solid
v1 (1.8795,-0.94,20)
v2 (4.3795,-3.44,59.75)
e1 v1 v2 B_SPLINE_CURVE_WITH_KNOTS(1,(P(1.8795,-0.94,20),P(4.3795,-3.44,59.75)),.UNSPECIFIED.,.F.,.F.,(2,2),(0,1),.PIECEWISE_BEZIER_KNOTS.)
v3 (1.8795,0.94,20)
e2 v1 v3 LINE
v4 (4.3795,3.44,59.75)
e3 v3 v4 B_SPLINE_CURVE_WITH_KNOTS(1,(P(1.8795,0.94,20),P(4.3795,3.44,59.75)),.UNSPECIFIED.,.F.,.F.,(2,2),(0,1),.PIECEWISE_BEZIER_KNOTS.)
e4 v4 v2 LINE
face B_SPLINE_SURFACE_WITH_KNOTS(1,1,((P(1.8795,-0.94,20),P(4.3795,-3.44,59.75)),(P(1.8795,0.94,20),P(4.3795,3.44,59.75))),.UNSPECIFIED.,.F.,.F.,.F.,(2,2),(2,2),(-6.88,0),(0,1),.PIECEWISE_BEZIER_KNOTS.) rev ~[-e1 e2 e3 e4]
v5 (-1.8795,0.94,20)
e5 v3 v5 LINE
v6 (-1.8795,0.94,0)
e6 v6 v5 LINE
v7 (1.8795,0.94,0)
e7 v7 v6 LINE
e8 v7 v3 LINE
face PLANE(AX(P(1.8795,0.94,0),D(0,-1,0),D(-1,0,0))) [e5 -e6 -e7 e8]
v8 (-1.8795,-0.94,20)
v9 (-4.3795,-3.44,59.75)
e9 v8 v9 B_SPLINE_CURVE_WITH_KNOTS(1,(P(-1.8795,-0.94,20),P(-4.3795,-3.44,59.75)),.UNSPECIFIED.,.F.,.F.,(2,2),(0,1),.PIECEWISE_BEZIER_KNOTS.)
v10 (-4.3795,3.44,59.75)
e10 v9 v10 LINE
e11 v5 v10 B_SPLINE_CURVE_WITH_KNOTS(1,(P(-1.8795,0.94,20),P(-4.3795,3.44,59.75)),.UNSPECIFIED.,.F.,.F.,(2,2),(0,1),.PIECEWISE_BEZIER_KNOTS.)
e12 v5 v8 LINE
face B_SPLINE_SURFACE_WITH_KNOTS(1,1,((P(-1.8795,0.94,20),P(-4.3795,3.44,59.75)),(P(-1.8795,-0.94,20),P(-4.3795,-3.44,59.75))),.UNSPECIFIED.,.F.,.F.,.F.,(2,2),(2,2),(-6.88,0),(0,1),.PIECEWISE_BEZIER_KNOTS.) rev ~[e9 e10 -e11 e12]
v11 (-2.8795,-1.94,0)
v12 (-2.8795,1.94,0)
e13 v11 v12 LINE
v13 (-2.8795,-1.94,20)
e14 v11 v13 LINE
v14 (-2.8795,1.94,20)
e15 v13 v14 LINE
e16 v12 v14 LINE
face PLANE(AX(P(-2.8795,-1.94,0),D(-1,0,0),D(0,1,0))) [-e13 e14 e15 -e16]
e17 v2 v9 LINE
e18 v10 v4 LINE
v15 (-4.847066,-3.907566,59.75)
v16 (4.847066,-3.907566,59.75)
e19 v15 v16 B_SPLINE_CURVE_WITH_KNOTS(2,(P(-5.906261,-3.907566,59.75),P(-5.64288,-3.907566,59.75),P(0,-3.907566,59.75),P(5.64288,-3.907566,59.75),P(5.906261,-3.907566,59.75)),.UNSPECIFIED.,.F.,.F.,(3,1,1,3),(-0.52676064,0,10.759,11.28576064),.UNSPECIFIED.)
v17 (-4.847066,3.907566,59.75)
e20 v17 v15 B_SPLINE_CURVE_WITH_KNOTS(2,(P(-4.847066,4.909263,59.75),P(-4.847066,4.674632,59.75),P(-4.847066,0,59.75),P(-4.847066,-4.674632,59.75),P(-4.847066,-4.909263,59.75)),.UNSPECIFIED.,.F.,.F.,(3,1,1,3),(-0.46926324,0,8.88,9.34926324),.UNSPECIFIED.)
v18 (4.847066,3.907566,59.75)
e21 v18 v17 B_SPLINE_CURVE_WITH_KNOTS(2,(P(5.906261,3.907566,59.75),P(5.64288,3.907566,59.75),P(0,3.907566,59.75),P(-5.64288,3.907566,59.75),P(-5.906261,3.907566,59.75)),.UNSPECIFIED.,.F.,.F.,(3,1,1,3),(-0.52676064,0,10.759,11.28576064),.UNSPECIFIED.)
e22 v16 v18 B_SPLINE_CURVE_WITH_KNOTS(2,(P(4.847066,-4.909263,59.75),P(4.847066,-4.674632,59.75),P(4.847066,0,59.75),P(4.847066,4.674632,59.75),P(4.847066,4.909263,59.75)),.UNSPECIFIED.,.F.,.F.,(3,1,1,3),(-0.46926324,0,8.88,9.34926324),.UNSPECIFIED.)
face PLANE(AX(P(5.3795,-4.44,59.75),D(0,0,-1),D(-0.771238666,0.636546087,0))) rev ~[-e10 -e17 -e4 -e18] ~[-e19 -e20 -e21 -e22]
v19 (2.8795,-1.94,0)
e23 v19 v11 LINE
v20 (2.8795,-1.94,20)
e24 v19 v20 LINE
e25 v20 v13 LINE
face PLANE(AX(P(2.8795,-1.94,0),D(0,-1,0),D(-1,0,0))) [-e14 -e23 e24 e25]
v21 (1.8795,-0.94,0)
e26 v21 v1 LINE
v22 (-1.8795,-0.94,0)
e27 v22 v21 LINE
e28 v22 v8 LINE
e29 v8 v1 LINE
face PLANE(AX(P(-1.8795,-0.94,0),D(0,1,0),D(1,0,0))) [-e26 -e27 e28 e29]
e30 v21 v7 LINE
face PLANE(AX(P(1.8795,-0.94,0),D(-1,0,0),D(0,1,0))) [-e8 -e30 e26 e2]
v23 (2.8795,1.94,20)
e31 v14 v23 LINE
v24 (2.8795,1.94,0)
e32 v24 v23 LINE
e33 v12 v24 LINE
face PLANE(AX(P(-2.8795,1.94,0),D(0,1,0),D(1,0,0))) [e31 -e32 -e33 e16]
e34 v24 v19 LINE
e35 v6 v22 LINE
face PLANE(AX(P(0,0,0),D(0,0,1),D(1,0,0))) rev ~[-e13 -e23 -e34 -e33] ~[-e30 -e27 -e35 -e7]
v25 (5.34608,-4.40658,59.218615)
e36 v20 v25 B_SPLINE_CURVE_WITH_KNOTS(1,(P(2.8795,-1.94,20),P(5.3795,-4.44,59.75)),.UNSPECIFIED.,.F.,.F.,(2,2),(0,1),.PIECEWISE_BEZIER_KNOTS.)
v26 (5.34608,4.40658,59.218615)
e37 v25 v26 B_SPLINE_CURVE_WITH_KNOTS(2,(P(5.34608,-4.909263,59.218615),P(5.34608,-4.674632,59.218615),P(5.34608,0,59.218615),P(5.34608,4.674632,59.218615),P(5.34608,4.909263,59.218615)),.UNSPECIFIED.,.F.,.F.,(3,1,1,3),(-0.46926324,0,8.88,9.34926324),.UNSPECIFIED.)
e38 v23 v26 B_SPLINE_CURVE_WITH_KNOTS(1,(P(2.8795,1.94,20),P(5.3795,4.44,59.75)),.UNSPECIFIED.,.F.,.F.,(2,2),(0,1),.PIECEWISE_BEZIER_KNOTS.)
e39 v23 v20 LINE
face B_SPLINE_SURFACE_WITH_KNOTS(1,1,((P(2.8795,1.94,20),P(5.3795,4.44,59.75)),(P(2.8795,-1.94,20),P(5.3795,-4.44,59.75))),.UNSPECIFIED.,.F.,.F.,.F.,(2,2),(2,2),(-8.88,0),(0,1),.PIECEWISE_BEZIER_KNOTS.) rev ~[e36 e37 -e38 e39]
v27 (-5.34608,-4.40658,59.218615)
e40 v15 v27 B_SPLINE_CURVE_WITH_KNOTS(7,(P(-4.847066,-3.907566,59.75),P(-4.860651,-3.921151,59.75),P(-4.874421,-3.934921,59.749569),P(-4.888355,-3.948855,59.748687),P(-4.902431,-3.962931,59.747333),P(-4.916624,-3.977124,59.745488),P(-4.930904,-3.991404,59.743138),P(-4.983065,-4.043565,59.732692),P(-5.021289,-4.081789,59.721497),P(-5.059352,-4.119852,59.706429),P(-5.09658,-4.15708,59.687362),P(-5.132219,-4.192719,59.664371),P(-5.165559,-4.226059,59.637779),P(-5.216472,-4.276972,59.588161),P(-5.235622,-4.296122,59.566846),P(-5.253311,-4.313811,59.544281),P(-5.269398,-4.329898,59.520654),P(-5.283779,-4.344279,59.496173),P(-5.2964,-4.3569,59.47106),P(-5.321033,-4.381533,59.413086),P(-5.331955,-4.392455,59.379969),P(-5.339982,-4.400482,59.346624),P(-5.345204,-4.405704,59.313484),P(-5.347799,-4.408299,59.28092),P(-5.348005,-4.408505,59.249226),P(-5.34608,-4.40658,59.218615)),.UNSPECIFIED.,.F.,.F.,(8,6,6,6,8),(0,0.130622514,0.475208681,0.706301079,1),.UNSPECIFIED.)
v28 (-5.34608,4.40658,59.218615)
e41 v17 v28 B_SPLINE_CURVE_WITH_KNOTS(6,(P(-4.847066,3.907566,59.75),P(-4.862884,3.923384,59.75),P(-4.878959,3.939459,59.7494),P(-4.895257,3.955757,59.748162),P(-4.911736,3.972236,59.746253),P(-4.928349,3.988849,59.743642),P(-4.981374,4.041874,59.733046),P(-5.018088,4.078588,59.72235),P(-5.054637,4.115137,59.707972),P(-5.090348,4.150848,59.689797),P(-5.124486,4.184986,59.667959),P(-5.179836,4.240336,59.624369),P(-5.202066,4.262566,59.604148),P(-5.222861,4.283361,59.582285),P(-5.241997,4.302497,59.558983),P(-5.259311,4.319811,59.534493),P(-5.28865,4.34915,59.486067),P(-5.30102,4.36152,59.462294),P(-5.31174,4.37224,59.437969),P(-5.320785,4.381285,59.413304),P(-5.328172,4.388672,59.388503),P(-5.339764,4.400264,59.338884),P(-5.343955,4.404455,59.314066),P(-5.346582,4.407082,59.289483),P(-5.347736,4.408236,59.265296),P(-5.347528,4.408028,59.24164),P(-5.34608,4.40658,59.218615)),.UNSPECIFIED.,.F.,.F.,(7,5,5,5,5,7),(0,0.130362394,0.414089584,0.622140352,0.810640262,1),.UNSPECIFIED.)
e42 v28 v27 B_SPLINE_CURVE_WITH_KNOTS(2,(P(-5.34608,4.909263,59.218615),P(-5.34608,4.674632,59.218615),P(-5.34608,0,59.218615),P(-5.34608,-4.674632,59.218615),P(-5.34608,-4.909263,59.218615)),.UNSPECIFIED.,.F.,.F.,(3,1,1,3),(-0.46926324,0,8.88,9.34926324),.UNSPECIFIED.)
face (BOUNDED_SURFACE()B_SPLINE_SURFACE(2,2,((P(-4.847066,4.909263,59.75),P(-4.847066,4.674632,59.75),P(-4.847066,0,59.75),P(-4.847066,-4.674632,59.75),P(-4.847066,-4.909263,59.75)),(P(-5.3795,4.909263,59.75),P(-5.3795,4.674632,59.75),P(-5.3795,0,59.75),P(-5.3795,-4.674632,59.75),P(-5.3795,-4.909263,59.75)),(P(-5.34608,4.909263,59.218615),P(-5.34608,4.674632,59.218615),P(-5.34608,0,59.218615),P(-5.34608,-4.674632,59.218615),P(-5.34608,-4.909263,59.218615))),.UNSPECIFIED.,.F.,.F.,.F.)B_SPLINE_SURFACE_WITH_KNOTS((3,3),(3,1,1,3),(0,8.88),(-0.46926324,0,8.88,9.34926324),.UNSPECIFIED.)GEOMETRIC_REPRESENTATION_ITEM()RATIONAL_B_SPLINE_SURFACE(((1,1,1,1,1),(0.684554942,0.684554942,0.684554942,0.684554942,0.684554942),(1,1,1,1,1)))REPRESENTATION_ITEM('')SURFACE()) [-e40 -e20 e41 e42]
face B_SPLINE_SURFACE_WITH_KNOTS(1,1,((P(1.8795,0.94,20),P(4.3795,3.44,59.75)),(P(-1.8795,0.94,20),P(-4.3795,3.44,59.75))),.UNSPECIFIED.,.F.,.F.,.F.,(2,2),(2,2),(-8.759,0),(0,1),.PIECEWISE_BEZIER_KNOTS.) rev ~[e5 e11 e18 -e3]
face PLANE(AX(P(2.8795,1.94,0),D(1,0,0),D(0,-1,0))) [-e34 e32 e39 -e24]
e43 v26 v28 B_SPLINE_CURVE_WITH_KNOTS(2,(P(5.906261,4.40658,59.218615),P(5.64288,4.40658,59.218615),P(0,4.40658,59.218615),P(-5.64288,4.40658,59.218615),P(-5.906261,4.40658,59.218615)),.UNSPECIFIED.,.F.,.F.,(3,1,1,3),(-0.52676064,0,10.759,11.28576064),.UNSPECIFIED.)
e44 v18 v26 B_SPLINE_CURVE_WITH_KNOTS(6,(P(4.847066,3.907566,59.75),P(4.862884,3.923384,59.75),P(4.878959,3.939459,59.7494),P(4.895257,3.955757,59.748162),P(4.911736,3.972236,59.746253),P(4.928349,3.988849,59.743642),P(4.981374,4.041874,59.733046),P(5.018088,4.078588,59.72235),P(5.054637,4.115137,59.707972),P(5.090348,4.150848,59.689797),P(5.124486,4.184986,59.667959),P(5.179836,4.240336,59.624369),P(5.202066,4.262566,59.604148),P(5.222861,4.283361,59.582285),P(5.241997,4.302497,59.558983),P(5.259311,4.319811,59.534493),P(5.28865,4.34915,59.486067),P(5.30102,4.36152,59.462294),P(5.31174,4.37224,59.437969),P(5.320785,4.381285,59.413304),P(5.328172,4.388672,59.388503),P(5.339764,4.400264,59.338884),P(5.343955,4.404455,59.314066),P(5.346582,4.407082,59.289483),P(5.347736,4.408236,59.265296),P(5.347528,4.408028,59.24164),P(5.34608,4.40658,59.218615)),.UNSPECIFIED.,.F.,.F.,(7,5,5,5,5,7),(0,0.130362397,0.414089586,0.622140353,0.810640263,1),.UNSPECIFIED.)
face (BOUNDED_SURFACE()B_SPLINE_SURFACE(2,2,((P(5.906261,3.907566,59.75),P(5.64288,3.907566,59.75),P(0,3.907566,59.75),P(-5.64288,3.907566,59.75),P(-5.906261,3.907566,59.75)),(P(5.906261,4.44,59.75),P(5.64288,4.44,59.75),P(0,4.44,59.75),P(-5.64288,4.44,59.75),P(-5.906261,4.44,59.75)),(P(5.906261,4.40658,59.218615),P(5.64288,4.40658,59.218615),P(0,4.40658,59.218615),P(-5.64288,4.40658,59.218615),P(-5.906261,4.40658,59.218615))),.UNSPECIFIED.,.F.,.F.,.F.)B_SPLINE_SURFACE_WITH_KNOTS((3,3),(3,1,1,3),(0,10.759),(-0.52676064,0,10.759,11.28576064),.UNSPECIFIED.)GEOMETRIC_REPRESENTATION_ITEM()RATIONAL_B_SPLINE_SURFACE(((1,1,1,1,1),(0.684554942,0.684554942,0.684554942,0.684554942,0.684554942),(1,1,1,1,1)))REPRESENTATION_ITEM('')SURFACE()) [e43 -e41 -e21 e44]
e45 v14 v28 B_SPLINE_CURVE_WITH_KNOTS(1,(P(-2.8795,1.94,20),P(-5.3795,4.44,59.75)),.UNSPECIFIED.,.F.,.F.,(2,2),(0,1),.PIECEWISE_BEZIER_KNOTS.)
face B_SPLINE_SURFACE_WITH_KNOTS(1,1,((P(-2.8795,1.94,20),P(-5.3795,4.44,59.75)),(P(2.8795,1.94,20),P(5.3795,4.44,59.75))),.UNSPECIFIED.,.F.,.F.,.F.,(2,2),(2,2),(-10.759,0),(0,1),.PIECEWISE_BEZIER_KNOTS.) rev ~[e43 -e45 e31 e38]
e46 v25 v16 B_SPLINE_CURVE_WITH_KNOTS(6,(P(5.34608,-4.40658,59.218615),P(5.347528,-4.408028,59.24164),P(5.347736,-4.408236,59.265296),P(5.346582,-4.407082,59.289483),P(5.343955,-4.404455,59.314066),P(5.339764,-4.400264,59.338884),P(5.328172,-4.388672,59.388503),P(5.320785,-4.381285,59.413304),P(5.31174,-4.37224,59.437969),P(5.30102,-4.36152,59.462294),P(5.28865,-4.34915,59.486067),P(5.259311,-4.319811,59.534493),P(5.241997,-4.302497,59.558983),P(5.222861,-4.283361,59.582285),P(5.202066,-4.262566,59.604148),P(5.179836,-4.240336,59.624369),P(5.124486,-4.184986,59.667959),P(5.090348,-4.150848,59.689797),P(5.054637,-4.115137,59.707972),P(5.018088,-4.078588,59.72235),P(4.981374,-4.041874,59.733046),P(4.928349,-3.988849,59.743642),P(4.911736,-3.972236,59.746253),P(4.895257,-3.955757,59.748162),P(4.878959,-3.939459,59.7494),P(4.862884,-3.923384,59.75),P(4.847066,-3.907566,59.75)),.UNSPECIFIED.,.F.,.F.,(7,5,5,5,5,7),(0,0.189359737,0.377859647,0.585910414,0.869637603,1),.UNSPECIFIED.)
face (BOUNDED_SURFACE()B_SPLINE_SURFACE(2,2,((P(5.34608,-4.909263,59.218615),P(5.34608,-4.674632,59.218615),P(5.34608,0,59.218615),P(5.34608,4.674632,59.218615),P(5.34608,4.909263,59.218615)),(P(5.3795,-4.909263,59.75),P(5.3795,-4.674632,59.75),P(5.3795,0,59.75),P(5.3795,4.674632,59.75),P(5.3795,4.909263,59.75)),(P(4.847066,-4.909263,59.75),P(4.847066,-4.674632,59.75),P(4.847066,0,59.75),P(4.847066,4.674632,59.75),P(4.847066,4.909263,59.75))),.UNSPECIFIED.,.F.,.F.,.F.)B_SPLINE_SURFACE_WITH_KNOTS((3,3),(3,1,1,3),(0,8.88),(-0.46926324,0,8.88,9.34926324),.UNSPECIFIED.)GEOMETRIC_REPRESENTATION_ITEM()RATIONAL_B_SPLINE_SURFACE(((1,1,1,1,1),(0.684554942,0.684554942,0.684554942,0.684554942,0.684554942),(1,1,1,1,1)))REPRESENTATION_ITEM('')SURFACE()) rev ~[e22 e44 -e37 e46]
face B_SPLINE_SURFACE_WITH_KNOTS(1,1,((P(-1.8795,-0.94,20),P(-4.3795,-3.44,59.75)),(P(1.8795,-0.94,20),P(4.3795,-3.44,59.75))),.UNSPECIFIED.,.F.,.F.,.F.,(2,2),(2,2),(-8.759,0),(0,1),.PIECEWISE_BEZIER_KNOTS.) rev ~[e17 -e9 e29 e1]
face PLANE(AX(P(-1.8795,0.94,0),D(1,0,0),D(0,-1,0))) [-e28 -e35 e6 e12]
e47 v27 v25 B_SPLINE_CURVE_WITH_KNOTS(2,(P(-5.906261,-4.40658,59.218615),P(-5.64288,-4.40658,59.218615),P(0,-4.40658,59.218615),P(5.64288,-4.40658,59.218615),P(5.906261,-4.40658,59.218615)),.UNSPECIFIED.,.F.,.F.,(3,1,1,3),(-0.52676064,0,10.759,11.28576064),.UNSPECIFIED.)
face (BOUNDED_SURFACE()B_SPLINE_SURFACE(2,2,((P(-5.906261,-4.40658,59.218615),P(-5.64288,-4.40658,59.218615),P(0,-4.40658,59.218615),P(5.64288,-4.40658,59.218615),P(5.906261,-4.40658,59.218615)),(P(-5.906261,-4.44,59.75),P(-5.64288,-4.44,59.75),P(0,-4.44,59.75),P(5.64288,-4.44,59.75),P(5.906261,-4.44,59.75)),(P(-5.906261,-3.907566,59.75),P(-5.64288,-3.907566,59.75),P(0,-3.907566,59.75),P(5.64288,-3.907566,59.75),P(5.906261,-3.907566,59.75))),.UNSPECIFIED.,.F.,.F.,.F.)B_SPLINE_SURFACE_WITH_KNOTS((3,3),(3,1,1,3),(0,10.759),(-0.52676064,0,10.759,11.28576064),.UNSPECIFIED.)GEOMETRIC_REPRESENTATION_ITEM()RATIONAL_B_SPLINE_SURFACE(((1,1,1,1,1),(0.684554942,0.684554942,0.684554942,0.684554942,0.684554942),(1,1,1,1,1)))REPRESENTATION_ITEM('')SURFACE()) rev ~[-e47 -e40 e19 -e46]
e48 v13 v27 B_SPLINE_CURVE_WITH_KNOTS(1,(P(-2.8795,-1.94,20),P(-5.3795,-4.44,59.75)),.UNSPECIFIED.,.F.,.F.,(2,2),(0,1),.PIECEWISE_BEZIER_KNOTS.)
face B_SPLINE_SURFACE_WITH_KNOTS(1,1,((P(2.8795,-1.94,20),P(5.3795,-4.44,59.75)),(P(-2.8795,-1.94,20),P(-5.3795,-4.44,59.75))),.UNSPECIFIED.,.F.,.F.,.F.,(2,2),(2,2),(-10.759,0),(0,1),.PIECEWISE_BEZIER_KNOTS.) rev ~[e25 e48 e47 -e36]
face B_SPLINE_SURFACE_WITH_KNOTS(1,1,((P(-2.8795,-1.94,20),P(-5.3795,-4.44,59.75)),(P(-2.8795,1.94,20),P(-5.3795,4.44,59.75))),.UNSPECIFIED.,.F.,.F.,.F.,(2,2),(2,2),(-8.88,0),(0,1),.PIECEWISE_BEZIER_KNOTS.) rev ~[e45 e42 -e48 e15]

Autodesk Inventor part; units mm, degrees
ref_plane "YZ Plane" through (0, 0, 0) normal (1, 0, 0) x (0, 1, 0)
ref_plane "XZ Plane" through (0, 0, 0) normal (0, 1, 0) x (-1, 0, 0)
sketch "Skizze1" plane through (0, 0, 0) normal (0, 0, 1) x (1, 0, 0)
  line L0 (1.8795, 0.94) -> (-1.8795, 0.94)
  line L1 (-1.8795, 0.94) -> (-1.8795, -0.94)
  line L2 (-1.8795, -0.94) -> (1.8795, -0.94)
  line L3 (1.8795, -0.94) -> (1.8795, 0.94)
  line L4 (1.8795, 0.94) -> (-1.8795, -0.94) construction
  line L5 (-1.8795, 0.94) -> (1.8795, -0.94) construction
  line L6 (-2.8795, -1.94) -> (-2.8795, 1.94)
  line L7 (-2.8795, 1.94) -> (2.8795, 1.94)
  line L8 (2.8795, 1.94) -> (2.8795, -1.94)
  line L9 (2.8795, -1.94) -> (-2.8795, -1.94)
  point P0 (0, 0)
  dimension "d0" = 1.88
  dimension "d1" = 3.759
  dimension "d2" = 1
extrude "Ex1-RWG" add sketch "Skizze1" along normal blind 20
ref_plane "Endebene" through (0, 0, 59.75) normal (0, 0, 1) x (1, 0, 0)
sketch "S-Hornöffnung" plane through (0, 0, 59.75) normal (0, 0, 1) x (1, 0, 0)
  line L0 (2.8795, -1.94) -> (2.8795, 1.94) projected
  line L1 (2.8795, 1.94) -> (-2.8795, 1.94) projected
  line L2 (-2.8795, 1.94) -> (-2.8795, -1.94) projected
  line L3 (-2.8795, -1.94) -> (2.8795, -1.94) projected
  line L4 (1.8795, 0.94) -> (1.8795, -0.94) projected
  line L5 (1.8795, -0.94) -> (-1.8795, -0.94) projected
  line L6 (-1.8795, -0.94) -> (-1.8795, 0.94) projected
  line L7 (-1.8795, 0.94) -> (1.8795, 0.94) projected
  line L8 (4.3795, 3.44) -> (4.3795, -3.44)
  line L9 (4.3795, -3.44) -> (-4.3795, -3.44)
  line L10 (-4.3795, -3.44) -> (-4.3795, 3.44)
  line L11 (-4.3795, 3.44) -> (4.3795, 3.44)
  line L12 (5.3795, -4.44) -> (5.3795, 4.44)
  line L13 (5.3795, 4.44) -> (-5.3795, 4.44)
  line L14 (-5.3795, 4.44) -> (-5.3795, -4.44)
  line L15 (-5.3795, -4.44) -> (5.3795, -4.44)
  point P0 (0, 0)
  dimension "d19" = 2.5
  dimension "d20" = 1
sketch "S-RWGÜbergang" plane through (0, 0, 20) normal (0, 0, 1) x (1, 0, 0)
  line L0 (2.8795, -1.94) -> (2.8795, 1.94) projected
  line L1 (2.8795, 1.94) -> (-2.8795, 1.94) projected
  line L2 (-2.8795, 1.94) -> (-2.8795, -1.94) projected
  line L3 (-2.8795, -1.94) -> (2.8795, -1.94) projected
  line L4 (1.8795, 0.94) -> (1.8795, -0.94) projected
  line L5 (1.8795, -0.94) -> (-1.8795, -0.94) projected
  line L6 (-1.8795, -0.94) -> (-1.8795, 0.94) projected
  line L7 (-1.8795, 0.94) -> (1.8795, 0.94) projected
  point P0 (0, 0)
loft "Erhebung-Horn1" add profiles "S-Hornöffnung" section 1 edges at (2.8795, 0, 20) (0, 1.94, 20) (-2.8795, 0, 20) (0, -1.94, 20) contours L3 L2 L1 L0 | L4 L5 L6 L7 | L8 L9 L10 L11 | L15 L14 L13 L12
loft "Erhebung-Horn2" cut profiles "S-Hornöffnung" section 1 edges at (0, 0.94, 20) (1.8795, 0, 20) (0, -0.94, 20) (-1.8795, 0, 20) contours L3 L2 L1 L0 | L4 L5 L6 L7 | L8 L9 L10 L11
fillet "Rundung-0.5mm" radius 0.5 4 edges at (0, 4.44, 59.75) (-5.3795, 0, 59.75) (0, -4.44, 59.75) (5.3795, 0, 59.75)
fillet_without_effect "Rundung-10mm"
properties part number "RWG_Horn_ProbeAntennaV1"
